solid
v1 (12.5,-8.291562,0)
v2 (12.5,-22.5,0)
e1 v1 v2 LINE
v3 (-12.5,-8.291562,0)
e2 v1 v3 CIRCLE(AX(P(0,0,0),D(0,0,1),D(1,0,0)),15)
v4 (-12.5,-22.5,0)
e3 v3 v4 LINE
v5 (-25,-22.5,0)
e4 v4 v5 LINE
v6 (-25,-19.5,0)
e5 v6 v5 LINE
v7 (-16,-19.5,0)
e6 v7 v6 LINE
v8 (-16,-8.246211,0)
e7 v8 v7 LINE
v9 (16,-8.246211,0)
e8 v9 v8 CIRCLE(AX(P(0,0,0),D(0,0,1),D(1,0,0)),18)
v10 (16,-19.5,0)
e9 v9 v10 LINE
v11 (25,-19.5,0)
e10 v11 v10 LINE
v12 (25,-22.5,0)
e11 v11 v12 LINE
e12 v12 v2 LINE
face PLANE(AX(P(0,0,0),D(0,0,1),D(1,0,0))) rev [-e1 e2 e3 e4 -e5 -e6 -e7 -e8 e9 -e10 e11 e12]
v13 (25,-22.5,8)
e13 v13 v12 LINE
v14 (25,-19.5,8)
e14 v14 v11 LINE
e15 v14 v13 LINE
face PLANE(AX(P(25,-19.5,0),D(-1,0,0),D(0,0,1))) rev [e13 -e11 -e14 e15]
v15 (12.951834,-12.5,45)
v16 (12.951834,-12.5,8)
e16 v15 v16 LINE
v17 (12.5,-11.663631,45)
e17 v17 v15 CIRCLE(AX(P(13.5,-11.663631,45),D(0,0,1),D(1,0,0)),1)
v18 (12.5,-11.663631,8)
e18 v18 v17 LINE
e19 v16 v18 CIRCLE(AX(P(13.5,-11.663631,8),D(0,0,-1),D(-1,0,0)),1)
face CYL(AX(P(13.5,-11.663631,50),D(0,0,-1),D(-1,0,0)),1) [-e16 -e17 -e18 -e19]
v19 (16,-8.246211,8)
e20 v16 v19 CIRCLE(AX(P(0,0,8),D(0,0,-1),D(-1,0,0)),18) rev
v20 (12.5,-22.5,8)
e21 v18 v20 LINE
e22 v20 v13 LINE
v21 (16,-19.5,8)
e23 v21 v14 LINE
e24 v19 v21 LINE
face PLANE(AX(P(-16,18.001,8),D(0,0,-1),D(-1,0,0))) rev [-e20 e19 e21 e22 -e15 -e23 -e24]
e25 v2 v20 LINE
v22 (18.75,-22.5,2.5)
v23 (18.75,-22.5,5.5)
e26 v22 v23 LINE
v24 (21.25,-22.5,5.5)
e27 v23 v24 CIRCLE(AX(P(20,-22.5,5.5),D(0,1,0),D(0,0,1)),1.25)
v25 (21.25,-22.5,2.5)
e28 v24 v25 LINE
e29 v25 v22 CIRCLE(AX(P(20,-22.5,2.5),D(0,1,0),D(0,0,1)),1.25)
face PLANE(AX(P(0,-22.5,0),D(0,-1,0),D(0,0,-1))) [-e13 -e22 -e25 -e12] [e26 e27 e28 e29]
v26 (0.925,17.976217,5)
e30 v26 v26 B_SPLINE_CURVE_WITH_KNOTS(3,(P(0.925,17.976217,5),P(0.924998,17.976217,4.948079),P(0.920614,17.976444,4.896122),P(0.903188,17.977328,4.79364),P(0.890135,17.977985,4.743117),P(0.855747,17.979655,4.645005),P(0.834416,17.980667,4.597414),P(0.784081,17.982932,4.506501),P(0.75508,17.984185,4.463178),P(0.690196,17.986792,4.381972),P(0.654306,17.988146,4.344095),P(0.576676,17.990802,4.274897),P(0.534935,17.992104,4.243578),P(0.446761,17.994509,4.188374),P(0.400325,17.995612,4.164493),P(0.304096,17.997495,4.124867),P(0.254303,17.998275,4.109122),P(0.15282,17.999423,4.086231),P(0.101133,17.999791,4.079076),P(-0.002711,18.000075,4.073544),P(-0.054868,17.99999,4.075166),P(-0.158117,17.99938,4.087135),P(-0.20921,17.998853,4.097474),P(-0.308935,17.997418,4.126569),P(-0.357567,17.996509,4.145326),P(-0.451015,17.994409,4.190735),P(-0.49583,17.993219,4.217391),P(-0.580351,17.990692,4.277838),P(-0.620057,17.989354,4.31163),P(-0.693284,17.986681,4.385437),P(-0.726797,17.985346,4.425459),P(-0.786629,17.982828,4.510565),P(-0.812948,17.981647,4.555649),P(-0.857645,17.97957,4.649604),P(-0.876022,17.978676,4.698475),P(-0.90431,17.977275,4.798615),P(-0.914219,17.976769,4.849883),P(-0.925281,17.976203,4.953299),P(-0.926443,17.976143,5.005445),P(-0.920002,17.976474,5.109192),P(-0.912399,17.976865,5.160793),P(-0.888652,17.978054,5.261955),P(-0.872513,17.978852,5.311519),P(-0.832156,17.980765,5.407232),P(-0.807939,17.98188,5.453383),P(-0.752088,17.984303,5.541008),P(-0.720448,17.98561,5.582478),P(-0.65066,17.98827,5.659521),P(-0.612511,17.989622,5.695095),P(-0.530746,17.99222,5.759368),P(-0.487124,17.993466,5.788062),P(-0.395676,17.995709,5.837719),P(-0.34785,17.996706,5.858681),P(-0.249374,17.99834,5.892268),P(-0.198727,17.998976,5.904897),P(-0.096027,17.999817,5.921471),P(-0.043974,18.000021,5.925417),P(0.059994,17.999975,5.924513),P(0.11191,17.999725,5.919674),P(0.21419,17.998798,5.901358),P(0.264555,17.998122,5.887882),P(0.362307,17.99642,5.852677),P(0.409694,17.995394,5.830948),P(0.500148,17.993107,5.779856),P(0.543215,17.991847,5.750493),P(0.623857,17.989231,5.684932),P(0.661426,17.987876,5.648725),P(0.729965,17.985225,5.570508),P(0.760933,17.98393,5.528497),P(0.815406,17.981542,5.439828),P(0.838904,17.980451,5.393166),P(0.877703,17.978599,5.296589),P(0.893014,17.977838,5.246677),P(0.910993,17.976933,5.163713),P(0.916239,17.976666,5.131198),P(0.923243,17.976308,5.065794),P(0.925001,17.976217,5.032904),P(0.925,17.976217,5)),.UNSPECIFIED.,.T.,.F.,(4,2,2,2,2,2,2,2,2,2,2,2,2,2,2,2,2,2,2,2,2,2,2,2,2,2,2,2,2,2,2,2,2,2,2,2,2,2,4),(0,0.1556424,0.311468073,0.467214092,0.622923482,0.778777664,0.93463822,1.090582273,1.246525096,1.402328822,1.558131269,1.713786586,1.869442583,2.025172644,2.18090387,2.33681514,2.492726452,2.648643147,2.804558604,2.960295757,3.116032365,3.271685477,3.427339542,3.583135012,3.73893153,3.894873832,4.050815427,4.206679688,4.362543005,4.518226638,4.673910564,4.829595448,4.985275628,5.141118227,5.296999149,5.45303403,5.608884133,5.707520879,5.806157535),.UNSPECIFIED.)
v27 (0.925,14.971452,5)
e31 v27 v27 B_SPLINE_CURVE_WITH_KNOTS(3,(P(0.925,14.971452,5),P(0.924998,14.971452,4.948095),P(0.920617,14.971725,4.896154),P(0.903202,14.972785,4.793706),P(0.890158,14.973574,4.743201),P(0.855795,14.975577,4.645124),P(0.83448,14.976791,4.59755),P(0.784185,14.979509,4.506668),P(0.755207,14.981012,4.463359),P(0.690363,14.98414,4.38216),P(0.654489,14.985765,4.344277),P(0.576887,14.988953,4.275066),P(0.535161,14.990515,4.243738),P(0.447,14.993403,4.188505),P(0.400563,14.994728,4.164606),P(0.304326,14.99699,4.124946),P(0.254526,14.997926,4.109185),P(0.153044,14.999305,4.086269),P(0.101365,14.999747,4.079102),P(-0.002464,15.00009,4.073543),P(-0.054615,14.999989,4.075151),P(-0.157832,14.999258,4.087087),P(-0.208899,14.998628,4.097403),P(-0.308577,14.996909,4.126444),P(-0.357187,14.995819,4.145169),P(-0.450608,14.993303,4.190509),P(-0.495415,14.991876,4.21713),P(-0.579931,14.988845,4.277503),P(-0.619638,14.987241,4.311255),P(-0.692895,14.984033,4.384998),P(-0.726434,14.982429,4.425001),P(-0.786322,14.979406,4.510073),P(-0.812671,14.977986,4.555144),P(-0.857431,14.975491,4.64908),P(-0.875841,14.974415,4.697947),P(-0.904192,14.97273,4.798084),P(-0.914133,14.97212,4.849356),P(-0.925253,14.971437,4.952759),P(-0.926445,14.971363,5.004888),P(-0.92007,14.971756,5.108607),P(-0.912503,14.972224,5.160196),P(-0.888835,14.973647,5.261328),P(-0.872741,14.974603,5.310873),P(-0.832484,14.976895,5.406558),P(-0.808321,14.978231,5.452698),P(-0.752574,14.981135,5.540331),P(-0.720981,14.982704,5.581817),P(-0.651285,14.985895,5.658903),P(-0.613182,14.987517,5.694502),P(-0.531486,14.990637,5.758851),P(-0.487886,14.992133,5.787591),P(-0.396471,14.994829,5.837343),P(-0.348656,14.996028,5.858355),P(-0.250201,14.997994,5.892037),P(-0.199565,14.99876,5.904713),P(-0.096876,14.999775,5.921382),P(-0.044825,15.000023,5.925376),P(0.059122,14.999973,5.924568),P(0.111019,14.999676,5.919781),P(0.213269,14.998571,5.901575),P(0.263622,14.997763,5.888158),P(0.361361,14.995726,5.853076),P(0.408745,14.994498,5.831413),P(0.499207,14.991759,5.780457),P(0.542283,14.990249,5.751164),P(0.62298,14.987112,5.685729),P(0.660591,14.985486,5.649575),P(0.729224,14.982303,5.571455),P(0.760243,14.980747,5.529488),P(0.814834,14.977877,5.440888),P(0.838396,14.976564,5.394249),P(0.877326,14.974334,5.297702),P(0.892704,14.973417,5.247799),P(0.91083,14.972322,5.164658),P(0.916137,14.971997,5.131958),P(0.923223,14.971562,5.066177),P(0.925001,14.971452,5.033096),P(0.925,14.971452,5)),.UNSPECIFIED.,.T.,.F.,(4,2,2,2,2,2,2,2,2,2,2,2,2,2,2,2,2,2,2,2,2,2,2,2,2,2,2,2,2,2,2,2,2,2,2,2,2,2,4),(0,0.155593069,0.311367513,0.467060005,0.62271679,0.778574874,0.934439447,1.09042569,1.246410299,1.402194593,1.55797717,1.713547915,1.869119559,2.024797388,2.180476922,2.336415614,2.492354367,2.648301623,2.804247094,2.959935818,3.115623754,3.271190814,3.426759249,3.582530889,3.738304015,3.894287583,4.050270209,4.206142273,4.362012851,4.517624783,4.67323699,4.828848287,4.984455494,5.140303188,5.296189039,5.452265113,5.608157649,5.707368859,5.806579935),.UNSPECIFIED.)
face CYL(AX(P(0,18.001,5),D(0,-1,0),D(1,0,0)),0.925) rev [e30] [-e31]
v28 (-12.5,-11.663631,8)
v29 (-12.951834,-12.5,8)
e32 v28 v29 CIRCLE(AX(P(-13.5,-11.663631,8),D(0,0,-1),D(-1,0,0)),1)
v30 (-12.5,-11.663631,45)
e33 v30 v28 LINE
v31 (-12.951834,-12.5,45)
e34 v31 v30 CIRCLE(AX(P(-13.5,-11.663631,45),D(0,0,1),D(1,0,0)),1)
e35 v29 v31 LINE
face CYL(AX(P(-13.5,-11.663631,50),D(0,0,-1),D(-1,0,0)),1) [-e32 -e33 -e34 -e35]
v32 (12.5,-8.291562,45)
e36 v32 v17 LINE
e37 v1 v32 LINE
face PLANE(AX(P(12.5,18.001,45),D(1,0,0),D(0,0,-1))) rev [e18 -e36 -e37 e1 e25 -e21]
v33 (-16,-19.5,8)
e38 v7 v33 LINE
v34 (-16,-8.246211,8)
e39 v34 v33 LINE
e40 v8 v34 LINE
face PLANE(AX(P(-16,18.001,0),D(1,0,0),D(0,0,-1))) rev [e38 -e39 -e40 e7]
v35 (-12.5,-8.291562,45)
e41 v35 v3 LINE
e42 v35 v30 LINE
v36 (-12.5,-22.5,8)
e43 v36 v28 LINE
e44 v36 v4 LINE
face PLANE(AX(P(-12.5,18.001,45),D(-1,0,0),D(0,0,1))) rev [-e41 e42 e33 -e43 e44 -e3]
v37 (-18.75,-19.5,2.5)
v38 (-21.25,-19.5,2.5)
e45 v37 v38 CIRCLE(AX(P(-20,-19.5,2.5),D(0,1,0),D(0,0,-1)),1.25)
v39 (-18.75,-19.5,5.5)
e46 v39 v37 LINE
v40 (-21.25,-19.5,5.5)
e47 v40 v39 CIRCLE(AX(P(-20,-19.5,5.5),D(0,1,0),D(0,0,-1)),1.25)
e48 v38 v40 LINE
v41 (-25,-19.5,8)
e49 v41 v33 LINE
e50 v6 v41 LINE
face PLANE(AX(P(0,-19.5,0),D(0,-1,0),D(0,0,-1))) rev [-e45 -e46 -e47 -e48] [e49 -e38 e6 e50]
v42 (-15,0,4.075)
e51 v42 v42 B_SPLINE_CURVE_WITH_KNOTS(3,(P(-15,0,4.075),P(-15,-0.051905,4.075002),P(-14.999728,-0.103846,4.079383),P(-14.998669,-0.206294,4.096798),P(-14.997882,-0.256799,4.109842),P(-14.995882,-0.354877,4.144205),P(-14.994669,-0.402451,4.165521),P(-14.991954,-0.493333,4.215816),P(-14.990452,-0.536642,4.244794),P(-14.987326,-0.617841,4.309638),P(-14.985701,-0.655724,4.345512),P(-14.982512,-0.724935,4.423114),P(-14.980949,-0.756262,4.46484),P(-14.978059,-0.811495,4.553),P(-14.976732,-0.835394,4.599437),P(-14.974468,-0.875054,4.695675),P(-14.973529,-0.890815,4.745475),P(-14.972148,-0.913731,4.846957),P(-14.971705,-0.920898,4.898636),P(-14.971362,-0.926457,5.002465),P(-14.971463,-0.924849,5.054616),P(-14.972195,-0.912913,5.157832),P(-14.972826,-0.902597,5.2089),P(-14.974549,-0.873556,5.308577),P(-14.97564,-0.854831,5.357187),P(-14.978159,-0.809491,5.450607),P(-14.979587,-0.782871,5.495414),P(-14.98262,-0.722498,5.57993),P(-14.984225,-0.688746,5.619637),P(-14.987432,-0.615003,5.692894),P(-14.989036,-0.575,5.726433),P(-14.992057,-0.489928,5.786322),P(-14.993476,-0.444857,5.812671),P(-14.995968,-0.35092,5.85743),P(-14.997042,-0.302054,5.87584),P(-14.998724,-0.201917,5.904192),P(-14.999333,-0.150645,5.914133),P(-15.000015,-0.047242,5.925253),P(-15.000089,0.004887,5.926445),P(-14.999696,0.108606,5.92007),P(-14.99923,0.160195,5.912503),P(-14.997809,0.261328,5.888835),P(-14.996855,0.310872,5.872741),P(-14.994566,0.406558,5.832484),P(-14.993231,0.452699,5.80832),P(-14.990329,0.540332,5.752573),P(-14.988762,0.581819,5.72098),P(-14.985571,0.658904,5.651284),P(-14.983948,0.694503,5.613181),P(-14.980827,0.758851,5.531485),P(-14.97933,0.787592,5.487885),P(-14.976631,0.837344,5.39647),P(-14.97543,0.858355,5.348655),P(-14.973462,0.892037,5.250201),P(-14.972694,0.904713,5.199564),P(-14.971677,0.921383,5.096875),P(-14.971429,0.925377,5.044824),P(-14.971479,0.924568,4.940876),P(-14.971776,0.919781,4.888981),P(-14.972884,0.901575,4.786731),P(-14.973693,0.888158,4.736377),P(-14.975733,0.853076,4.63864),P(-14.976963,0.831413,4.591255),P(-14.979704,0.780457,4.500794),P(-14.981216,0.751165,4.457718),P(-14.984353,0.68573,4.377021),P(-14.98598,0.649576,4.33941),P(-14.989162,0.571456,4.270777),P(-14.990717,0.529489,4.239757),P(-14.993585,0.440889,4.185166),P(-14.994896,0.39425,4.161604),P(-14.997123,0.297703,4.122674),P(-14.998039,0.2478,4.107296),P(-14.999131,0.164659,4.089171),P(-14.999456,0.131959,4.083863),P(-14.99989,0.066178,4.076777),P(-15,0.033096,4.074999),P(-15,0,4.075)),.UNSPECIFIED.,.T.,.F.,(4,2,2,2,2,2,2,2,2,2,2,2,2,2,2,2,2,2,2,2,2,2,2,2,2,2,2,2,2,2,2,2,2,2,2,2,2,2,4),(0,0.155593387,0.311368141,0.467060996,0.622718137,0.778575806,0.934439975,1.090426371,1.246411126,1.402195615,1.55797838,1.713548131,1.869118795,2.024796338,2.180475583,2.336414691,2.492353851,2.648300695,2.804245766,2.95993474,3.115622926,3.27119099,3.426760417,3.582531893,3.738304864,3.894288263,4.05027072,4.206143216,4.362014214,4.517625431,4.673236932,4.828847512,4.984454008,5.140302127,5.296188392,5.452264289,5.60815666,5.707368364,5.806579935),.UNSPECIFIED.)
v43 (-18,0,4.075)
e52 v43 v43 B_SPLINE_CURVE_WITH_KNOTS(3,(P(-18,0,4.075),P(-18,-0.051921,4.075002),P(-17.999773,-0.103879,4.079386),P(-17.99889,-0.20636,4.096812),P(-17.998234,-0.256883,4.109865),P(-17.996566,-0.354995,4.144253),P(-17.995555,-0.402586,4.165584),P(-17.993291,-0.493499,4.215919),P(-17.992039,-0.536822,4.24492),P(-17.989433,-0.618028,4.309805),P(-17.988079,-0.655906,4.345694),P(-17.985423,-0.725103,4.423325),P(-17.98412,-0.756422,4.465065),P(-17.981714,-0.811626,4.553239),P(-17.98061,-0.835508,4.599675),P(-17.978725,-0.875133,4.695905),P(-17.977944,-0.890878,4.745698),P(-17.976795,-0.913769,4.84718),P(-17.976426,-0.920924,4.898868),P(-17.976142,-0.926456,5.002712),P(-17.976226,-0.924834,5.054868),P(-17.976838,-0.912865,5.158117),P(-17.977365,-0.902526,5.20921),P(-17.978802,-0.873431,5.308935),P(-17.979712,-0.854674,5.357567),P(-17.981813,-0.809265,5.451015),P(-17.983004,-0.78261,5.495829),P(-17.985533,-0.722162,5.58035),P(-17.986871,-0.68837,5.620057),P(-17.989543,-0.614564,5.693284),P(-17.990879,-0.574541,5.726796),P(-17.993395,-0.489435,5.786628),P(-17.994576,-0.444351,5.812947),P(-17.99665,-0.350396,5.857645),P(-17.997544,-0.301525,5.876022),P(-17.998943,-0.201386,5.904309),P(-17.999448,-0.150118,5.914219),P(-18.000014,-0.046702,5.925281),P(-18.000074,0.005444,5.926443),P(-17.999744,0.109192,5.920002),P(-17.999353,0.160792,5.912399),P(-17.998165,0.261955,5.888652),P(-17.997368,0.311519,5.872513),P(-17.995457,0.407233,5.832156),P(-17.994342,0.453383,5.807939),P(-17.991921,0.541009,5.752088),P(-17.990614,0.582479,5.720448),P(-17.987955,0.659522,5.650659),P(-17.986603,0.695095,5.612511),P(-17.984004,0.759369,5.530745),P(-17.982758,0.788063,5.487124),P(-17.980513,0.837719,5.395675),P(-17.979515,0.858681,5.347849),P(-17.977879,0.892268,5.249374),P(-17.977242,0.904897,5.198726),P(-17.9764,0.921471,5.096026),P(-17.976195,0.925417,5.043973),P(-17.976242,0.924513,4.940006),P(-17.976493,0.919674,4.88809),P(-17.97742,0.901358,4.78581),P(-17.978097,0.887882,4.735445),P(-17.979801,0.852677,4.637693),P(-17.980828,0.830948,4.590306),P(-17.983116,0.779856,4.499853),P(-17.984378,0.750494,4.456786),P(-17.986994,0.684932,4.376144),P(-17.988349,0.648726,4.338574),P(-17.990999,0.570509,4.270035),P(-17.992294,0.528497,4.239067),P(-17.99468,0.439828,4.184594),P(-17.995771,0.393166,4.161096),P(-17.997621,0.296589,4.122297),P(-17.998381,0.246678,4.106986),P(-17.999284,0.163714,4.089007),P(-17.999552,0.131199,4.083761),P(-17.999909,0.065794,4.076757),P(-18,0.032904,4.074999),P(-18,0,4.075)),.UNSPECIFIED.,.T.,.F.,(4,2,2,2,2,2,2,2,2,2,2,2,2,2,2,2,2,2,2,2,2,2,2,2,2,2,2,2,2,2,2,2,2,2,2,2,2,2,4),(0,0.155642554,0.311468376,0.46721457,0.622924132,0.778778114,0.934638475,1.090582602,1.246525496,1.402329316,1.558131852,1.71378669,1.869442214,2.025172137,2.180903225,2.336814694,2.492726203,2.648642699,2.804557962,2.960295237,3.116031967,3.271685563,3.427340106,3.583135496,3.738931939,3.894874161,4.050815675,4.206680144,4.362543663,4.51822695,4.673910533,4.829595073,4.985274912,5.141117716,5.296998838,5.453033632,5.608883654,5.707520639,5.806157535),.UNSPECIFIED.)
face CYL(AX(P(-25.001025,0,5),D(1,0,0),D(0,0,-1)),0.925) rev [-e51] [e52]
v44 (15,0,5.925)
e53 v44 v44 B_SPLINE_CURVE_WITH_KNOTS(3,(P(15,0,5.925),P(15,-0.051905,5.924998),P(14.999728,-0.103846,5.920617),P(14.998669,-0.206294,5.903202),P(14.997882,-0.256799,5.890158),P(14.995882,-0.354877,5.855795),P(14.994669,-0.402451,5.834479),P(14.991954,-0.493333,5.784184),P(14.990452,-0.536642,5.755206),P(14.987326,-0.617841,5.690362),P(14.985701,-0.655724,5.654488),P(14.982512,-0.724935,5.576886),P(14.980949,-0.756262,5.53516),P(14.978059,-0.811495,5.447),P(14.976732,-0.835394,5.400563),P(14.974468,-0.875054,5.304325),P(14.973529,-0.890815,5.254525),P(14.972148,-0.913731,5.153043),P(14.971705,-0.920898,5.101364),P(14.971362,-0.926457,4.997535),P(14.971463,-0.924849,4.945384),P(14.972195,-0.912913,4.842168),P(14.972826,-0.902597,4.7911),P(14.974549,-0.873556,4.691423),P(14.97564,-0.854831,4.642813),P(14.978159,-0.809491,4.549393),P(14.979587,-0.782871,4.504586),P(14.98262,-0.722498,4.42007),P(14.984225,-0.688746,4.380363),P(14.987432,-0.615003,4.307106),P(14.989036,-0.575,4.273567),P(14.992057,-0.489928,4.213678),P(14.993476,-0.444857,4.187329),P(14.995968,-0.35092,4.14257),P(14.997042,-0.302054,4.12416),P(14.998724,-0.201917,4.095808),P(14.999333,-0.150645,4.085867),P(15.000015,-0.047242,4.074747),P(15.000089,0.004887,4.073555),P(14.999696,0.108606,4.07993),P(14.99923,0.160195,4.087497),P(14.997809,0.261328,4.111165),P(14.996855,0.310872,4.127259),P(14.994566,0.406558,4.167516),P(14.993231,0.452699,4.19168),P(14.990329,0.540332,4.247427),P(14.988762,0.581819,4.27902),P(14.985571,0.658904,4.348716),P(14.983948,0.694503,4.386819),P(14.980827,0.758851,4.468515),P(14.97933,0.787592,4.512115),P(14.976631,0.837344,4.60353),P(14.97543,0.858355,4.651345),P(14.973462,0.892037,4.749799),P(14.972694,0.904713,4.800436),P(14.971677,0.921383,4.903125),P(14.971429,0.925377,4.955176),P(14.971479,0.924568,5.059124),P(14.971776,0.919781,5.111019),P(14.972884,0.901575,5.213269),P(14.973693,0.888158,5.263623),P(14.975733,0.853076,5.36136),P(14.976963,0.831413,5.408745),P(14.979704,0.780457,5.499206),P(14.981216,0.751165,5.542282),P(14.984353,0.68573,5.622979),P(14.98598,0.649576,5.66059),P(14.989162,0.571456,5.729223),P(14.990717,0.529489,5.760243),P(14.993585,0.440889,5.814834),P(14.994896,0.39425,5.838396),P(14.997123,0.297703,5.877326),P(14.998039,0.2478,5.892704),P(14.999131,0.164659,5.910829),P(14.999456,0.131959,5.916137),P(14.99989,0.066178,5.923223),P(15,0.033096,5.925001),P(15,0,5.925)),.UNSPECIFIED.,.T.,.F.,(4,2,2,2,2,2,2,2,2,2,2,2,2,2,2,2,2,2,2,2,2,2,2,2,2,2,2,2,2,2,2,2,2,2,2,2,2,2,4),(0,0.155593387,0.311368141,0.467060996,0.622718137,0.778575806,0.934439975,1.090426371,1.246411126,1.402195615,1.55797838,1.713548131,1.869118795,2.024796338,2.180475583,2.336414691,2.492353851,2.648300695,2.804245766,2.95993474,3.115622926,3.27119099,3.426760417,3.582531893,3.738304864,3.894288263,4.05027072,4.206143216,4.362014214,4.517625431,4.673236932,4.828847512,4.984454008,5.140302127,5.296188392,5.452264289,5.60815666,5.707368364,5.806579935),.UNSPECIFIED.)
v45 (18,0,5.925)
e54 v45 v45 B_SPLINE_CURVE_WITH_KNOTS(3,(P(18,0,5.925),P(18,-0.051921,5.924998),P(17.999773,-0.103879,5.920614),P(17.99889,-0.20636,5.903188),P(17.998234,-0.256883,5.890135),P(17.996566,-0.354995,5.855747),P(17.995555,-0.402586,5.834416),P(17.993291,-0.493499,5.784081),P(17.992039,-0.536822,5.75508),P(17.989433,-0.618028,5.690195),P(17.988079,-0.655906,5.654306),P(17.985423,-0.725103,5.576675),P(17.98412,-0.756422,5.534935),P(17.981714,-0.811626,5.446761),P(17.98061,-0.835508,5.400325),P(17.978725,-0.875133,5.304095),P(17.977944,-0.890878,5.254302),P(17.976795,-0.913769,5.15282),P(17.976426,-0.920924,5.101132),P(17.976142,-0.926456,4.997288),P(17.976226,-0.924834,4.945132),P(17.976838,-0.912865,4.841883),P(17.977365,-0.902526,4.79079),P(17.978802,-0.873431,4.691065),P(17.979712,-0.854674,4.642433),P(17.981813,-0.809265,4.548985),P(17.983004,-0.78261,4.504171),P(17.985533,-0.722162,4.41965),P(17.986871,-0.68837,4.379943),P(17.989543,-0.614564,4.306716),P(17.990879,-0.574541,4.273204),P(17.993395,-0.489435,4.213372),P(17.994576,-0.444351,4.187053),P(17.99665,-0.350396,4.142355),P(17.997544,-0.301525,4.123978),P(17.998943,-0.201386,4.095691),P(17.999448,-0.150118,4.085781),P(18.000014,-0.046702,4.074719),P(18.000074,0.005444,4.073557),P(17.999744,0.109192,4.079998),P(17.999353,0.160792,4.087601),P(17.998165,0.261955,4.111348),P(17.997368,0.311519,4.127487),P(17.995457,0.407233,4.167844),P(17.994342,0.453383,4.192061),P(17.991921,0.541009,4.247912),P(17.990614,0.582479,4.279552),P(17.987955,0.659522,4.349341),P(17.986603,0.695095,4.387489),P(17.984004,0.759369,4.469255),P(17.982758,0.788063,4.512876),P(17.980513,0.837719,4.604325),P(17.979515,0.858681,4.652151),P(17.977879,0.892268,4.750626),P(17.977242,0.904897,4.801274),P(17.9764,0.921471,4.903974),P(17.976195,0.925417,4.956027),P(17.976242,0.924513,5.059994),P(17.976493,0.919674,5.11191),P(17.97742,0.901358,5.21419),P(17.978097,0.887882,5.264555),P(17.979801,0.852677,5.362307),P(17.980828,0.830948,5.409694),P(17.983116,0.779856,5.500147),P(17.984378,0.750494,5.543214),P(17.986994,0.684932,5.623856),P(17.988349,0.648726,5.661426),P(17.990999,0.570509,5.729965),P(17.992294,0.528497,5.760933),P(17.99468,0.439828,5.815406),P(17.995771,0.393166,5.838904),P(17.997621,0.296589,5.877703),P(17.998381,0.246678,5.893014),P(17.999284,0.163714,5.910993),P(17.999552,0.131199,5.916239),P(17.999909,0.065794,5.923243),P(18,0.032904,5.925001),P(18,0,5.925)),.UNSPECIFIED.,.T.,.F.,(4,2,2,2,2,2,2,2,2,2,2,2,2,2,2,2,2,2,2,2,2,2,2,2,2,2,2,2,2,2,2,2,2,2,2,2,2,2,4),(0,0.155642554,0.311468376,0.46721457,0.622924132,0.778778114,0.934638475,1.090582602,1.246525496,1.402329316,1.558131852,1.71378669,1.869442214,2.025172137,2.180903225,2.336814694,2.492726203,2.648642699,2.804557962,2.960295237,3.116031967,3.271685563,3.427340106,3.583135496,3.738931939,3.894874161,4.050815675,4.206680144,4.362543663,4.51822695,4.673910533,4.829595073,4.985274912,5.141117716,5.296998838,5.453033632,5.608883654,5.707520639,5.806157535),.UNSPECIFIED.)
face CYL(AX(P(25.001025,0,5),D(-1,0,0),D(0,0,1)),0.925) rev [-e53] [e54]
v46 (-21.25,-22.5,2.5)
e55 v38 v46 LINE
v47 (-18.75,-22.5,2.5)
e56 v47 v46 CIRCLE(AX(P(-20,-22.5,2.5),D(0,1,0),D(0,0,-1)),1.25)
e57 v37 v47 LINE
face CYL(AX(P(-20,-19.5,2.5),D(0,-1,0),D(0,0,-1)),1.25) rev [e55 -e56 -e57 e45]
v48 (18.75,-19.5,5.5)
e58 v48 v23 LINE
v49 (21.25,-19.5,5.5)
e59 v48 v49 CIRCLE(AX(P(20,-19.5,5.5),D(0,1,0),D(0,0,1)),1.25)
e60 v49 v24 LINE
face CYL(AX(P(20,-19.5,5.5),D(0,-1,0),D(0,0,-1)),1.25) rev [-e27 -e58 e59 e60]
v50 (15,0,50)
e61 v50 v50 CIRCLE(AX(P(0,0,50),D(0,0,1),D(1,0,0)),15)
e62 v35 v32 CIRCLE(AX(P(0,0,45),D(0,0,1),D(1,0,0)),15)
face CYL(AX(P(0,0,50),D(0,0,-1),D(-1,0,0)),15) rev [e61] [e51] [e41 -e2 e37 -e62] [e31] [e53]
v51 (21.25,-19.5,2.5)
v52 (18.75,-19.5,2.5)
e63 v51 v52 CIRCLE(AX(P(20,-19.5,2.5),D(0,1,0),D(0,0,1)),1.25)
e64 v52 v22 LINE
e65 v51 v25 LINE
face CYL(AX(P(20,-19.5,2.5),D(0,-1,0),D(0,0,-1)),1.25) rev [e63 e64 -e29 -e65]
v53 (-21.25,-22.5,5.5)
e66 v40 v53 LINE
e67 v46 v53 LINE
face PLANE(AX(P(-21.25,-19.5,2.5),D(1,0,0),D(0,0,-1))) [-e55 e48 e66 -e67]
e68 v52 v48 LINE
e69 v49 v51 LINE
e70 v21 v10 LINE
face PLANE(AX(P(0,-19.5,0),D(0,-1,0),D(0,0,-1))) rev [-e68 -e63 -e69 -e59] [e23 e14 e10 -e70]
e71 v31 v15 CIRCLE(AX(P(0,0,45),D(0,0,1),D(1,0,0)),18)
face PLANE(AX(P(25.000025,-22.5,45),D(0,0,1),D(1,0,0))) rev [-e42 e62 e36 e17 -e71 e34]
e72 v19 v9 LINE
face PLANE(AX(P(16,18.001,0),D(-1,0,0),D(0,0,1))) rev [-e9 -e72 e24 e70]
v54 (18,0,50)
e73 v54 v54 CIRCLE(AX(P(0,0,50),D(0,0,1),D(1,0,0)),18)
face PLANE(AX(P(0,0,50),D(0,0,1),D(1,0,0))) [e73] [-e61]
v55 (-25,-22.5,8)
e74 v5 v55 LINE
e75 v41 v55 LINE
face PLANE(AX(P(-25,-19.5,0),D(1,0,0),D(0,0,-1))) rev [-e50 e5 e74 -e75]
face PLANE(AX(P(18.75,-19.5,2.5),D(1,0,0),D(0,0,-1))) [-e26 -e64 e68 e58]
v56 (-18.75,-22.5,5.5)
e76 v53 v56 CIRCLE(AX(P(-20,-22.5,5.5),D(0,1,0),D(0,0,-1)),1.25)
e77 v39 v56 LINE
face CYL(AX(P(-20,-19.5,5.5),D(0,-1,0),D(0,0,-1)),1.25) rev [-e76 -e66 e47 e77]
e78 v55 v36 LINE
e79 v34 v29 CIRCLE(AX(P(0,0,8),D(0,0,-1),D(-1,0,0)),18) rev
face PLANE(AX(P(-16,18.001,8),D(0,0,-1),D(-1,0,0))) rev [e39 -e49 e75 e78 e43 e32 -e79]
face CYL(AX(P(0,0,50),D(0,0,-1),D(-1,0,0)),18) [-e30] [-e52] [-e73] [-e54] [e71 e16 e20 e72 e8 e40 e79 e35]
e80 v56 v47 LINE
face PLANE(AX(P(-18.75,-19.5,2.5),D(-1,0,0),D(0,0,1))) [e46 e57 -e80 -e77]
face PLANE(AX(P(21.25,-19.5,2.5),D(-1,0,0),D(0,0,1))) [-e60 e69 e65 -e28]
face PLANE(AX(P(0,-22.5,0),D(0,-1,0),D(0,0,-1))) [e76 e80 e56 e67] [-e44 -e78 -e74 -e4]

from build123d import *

# Parameters (mm, degrees)
SKETCH1_R                = 18
SKETCH1_R_2              = 15
BOSS_EXTRUDE1_DEPTH      = 50
SKETCH2_W                = 50
SKETCH2_H                = 8
BOSS_EXTRUDE2_DEPTH      = 3
BOSS_EXTRUDE5_REACH      = 69.315
BOSS_EXTRUDE5_END_RADIUS = 18
SKETCH9_W                = 32
SKETCH9_H                = 8
SKETCH4_W                = 37
SKETCH4_H                = 10
CUT_EXTRUDE1_DEPTH       = 75.204110398
CUT_EXTRUDE2_REACH       = 71.031
CUT_EXTRUDE2_END_RADIUS  = 15
SKETCH6_W                = 25
SKETCH6_H                = 45
FILLET1_R                = 1
CUT_EXTRUDE3_REACH       = 62.26
CUT_EXTRUDE3_END_RADIUS  = 18
SKETCH7_R                = 0.925
CIRPATTERN1_START        = 14.971451916
CIRPATTERN1_OUTLINE_R    = 0.925
CIRPATTERN1_DEPTH        = 3.028548184
CIRPATTERN1_START_2      = 14.9714519
CIRPATTERN1_2_OUTLINE_R  = 0.925
CIRPATTERN1_2_DEPTH      = 3.028548184


# Read off the part's stored shape, not the designer's step: CirPattern1
with BuildPart() as part:
    # Sketch1 → Boss-Extrude1 (new body)
    with BuildSketch(Plane.XY):
        Circle(SKETCH1_R)
        Circle(SKETCH1_R_2, mode=Mode.SUBTRACT)
    extrude(amount=BOSS_EXTRUDE1_DEPTH)



with BuildPart() as body_2:
    # Sketch2 → Boss-Extrude2 (new body)
    with BuildSketch(Plane(origin=(0, -22.5, 0), x_dir=(1, 0, 0), z_dir=(0, 1, 0))):
        with Locations((0, -4)):
            Rectangle(SKETCH2_W, SKETCH2_H)
        with BuildLine():
            Line((21.25, -2.5), (21.25, -5.5))
            ThreePointArc((21.25, -5.5), (20, -6.75), (18.75, -5.5))
            Line((18.75, -5.5), (18.75, -2.5))
            ThreePointArc((18.75, -2.5), (20, -1.25), (21.25, -2.5))
        make_face(mode=Mode.SUBTRACT)
        with BuildLine():
            Line((-21.25, -2.5), (-21.25, -5.5))
            ThreePointArc((-21.25, -5.5), (-20, -6.75), (-18.75, -5.5))
            Line((-18.75, -5.5), (-18.75, -2.5))
            ThreePointArc((-18.75, -2.5), (-20, -1.25), (-21.25, -2.5))
        make_face(mode=Mode.SUBTRACT)
    extrude(amount=BOSS_EXTRUDE2_DEPTH)


with BuildPart() as part_1:
    add(part.part)

    add(body_2.part)  # Boss-Extrude5 merges body 2
    # Boss-Extrude5: up to this cylinder (the profile starts outside it)
    boss_extrude5_end = Plane(origin=(0, 0, 4), z_dir=(0, 0, -1)) * Cylinder(BOSS_EXTRUDE5_END_RADIUS, 175.63, mode=Mode.PRIVATE)
    # Sketch9 → Boss-Extrude5 (add, up to the surface)
    with BuildSketch(Plane(origin=(0, -19.5, 0), x_dir=(1, 0, 0), z_dir=(0, 1, 0)), mode=Mode.PRIVATE) as boss_extrude5_sk1:
        with Locations((0, -4)):
            Rectangle(SKETCH9_W, SKETCH9_H)
    boss_extrude5_tool1 = extrude(boss_extrude5_sk1.sketch, amount=BOSS_EXTRUDE5_REACH, mode=Mode.PRIVATE) - boss_extrude5_end
    add(boss_extrude5_tool1.solids().sort_by_distance((0, -19.5, 4))[0])

    # Sketch4 → Cut-Extrude1 (cut, through all)
    with BuildSketch(Plane.ZY.offset(25)):
        with Locations((26.5, -17.5)):
            Rectangle(SKETCH4_W, SKETCH4_H)
    extrude(amount=-CUT_EXTRUDE1_DEPTH, mode=Mode.SUBTRACT)

    # Cut-Extrude2: up to this cylinder (the profile starts outside it)
    cut_extrude2_end = Plane(origin=(0, 0, 22.5), z_dir=(0, 0, -1)) * Cylinder(CUT_EXTRUDE2_END_RADIUS, 173.062, mode=Mode.PRIVATE)
    # Sketch6 → Cut-Extrude2 (cut, up to the surface)
    with BuildSketch(Plane.XZ.offset(22.5), mode=Mode.PRIVATE) as cut_extrude2_sk1:
        with Locations((0, 22.5)):
            Rectangle(SKETCH6_W, SKETCH6_H)
    cut_extrude2_tool1 = extrude(cut_extrude2_sk1.sketch, amount=-CUT_EXTRUDE2_REACH, mode=Mode.PRIVATE) - cut_extrude2_end
    add(cut_extrude2_tool1.solids().sort_by_distance((0, -22.5, 22.5))[0], mode=Mode.SUBTRACT)

    # Fillet1
    # the kernel refuses this fillet: 1 mm, written as the material it takes off along each edge
    with BuildSketch(Plane(origin=(-12.5, -12.5, 8), x_dir=(-1.0, 1.3760033648058773e-12, 0), z_dir=(0, 0, 1)), Plane(origin=(12.5, -12.5, 45), x_dir=(1.0, 1.3602776120652602e-12, 0), z_dir=(0, 0, -1))) as fillet1_piece_1:
        with BuildLine():
            CenterArc((1, -0.836369457), FILLET1_R, 123.241294146, 56.758705854)
            Line((0, -0.836369457), (-0.02, -0.836369457))
            Line((-0.02, -0.836369457), (-0.02, 0))
            Line((-0.02, 0), (0, 0.02))
            ThreePointArc((0, 0.02), (0.225916923, 0.02), (0.440870524, 0.016727389))
            Line((0.440870524, 0.016727389), (0.451833847, 0))
        make_face()
    extrude(amount=37, mode=Mode.SUBTRACT)

    # Cut-Extrude3: up to this cylinder (the profile starts inside it)
    cut_extrude3_end = Plane(origin=(0, 0, 5), z_dir=(0, 0, -1)) * Cylinder(CUT_EXTRUDE3_END_RADIUS, 161.52, mode=Mode.PRIVATE)
    # Sketch7 → Cut-Extrude3 (cut, up to the surface)
    with BuildSketch(Plane(origin=(0, 0, 0), x_dir=(0, 0, -1), z_dir=(1, 0, 0)), mode=Mode.PRIVATE) as cut_extrude3_sk1:
        with Locations((-5, 0)):
            Circle(SKETCH7_R)
    cut_extrude3_tool1 = extrude(cut_extrude3_sk1.sketch, amount=-CUT_EXTRUDE3_REACH, mode=Mode.PRIVATE) & cut_extrude3_end
    add(cut_extrude3_tool1.solids().sort_by_distance((0, 0, 5))[0], mode=Mode.SUBTRACT)

    # CirPattern1 outline → CirPattern1 (cut)
    with BuildSketch(Plane.YZ.offset(CIRPATTERN1_START)):
        with Locations((0, 5)):
            Circle(CIRPATTERN1_OUTLINE_R)
    extrude(amount=CIRPATTERN1_DEPTH, mode=Mode.SUBTRACT)

    # CirPattern1 2 outline → CirPattern1 2 (cut)
    with BuildSketch(Plane(origin=(0, 0, 0), x_dir=(1, 0, 0), z_dir=(0, 1, 0)).offset(CIRPATTERN1_START_2)):
        with Locations((0, -5)):
            Circle(CIRPATTERN1_2_OUTLINE_R)
    extrude(amount=CIRPATTERN1_2_DEPTH, mode=Mode.SUBTRACT)


solid = part_1.part
